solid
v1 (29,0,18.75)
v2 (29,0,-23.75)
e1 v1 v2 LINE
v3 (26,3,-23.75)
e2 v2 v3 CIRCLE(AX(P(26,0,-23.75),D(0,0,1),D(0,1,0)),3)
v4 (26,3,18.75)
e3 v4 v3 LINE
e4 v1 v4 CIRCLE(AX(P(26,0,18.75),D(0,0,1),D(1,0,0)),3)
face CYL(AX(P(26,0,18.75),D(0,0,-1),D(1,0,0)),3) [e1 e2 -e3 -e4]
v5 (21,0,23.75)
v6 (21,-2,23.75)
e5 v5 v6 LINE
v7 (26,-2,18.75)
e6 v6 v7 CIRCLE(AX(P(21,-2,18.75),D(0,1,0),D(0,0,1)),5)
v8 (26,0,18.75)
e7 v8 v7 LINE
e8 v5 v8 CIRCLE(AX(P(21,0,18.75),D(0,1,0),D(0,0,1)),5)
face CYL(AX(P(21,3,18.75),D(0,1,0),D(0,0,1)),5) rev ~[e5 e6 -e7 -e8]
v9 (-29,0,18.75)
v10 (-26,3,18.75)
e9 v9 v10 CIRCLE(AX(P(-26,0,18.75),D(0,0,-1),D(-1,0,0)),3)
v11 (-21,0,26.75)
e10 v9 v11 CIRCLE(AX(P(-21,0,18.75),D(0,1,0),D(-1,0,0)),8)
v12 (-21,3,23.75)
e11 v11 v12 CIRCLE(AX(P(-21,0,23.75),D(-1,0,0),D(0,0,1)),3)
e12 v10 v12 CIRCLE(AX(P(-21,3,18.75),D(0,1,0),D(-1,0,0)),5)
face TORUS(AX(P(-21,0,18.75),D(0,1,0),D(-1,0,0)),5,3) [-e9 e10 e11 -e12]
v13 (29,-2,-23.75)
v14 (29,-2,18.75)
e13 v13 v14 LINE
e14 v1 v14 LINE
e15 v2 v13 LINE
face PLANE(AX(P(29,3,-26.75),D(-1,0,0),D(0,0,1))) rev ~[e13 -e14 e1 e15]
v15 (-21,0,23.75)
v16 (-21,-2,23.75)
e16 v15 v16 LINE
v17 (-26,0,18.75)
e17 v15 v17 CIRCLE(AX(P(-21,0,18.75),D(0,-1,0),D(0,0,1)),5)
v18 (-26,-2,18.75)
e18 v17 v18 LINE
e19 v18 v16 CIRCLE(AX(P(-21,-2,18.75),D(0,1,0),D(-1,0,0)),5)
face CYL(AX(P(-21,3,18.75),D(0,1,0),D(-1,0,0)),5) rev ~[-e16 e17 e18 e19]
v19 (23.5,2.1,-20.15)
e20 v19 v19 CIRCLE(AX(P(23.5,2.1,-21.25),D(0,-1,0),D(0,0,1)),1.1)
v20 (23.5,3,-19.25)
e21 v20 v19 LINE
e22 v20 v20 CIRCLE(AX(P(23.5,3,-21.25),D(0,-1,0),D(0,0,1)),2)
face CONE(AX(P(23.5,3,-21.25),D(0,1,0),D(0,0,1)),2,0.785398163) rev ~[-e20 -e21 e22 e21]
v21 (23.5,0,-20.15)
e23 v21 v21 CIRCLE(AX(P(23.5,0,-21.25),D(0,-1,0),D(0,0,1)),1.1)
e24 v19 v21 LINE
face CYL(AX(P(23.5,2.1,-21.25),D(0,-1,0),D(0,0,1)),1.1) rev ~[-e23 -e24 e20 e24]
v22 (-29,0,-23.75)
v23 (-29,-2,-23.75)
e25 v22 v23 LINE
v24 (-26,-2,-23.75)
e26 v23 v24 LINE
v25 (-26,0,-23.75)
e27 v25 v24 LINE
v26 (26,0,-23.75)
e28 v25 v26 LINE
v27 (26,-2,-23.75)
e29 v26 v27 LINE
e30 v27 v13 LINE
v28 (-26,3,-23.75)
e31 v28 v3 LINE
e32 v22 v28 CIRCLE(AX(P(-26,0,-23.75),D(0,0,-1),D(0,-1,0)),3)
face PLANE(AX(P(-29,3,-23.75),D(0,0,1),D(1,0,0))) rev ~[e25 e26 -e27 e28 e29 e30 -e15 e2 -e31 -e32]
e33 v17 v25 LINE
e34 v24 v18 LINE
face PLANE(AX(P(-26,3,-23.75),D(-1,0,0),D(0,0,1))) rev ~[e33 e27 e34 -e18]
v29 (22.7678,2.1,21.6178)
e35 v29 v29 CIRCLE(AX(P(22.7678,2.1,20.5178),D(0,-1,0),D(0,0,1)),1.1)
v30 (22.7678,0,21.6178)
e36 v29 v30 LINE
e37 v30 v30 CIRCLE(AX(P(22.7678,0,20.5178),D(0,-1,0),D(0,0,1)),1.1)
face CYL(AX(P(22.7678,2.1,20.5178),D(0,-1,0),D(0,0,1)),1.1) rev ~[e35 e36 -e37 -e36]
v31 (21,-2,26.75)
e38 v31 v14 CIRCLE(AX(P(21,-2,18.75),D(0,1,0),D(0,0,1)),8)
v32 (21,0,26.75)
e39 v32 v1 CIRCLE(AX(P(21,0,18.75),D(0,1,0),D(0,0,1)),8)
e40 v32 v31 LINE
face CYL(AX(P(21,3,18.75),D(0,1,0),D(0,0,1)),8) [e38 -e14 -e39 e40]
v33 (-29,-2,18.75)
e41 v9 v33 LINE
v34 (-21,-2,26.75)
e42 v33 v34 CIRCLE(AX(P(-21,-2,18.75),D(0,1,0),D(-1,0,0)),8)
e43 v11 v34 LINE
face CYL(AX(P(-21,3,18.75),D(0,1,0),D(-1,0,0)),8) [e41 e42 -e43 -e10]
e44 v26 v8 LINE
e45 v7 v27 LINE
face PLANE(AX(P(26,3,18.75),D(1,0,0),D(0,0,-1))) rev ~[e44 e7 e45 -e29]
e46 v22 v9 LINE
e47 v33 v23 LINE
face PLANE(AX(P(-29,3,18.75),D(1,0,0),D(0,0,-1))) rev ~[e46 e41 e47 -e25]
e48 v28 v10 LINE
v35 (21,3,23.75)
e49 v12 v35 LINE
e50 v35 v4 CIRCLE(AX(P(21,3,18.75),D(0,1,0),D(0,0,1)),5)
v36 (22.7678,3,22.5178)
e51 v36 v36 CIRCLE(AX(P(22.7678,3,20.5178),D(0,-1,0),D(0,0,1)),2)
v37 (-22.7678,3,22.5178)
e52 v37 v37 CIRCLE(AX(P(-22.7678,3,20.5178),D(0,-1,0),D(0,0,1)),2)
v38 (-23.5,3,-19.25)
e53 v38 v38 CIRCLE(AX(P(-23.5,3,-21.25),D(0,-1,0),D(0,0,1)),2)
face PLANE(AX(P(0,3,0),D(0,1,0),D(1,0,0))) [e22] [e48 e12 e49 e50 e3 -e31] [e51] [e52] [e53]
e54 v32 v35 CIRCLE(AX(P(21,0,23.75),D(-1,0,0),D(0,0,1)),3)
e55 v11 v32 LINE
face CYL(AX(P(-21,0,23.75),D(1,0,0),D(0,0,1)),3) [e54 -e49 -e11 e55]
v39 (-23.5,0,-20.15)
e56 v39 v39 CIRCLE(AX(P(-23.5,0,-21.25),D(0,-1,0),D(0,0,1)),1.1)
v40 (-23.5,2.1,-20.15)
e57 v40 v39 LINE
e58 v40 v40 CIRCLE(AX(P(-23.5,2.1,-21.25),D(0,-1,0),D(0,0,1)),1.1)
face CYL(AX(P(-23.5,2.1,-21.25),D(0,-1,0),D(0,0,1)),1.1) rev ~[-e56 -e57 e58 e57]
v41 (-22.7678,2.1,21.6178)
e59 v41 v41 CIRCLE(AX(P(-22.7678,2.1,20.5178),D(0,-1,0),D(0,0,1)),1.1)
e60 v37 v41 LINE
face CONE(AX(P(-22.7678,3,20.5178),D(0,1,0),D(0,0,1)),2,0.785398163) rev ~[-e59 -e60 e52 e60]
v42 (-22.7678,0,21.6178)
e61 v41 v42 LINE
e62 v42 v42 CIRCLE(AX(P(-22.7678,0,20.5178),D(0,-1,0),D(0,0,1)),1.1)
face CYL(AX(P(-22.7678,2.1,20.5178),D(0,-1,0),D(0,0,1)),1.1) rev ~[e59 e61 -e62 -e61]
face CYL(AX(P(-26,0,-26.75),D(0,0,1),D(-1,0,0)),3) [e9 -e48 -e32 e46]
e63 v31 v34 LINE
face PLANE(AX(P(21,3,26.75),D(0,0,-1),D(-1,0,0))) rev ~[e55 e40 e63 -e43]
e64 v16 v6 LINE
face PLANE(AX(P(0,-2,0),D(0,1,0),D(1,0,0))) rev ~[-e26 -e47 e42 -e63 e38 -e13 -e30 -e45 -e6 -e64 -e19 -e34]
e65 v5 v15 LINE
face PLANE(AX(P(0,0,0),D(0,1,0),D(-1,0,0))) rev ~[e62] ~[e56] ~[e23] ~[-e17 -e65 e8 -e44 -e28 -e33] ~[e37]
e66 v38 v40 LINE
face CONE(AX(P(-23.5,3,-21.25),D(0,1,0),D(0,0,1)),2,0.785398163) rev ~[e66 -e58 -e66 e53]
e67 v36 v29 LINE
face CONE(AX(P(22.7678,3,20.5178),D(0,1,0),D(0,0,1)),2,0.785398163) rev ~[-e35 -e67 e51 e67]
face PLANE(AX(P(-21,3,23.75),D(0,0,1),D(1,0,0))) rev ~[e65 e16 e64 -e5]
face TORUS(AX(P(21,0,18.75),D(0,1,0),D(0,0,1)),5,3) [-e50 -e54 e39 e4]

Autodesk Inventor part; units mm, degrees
ref_plane "YZ Plane" through (0, 0, 0) normal (1, 0, 0) x (0, 1, 0)
ref_plane "XZ Plane" through (0, 0, 0) normal (0, 1, 0) x (-1, 0, 0)
ref_plane "XY Plane" through (0, 0, 0) normal (0, 0, 1) x (1, 0, 0)
sketch "Sketch1" plane through (0, 0, 0) normal (0, 1, 0) x (-1, 0, 0)
  line L0 (-26, 23.75) -> (26, 23.75)
  line L1 (26, 23.75) -> (26, -23.75)
  line L2 (26, -23.75) -> (-26, -23.75)
  line L3 (-26, -23.75) -> (-26, 23.75)
  line L4 (-26, 23.75) -> (26, -23.75) construction
  line L5 (26, 23.75) -> (-26, -23.75) construction
  point P0 (0, 0)
  dimension "d0" = 52
  dimension "d1" = 47.5
extrude "Extrusion1" add sketch "Sketch1" along normal blind 3
fillet "Fillet1" radius 5 2 edges at (26, 1.5, 23.75) (-26, 1.5, 23.75)
sketch "Sketch2" plane through (0, 3, 0) normal (0, 1, 0) x (1, 0, 0)
  arc A0 (-26, -18.75) -> (-21, -23.75) centre (-21, -18.75) ccw projected
  line L0 (-21, -23.75) -> (21, -23.75) projected
  arc A1 (21, -23.75) -> (26, -18.75) centre (21, -18.75) ccw projected
  line L1 (26, -18.75) -> (26, 23.75) projected
  line L2 (26, 23.75) -> (-26, 23.75) projected
  line L3 (-26, 23.75) -> (-26, -18.75) projected
  line L4 (29, 26.75) -> (29, -18.75)
  arc A2 (21, -26.75) -> (29, -18.75) centre (21, -18.75) ccw
  line L5 (21, -26.75) -> (-21, -26.75)
  arc A3 (-29, -18.75) -> (-21, -26.75) centre (-21, -18.75) ccw
  line L6 (-29, -18.75) -> (-29, 26.75)
  line L7 (-29, 26.75) -> (29, 26.75)
  point P0 (0, 0)
  dimension "d5" = 3
extrude "Extrusion2" add sketch "Sketch2" against normal blind 5
sketch "Sketch3" plane through (0, 3, 0) normal (0, 1, 0) x (1, 0, 0)
  line L0 (26, -18.75) -> (26, 23.75) projected
  line L1 (29, 26.75) -> (26, 26.75)
  line L2 (26, 26.75) -> (26, 23.75)
  line L3 (26, 23.75) -> (29, 23.75)
  line L4 (29, 23.75) -> (29, 26.75)
  line L5 (26, 23.75) -> (21, 23.75)
  line L6 (21, 23.75) -> (21, 18.75)
  line L7 (21, 18.75) -> (26, 18.75)
  line L8 (26, 18.75) -> (26, 23.75)
  line L9 (-29, 26.75) -> (-26, 26.75)
  line L10 (-26, 26.75) -> (-26, 23.75)
  line L11 (-26, 23.75) -> (-29, 23.75)
  line L12 (-29, 23.75) -> (-29, 26.75)
  line L13 (-26, 23.75) -> (-21, 23.75)
  line L14 (-21, 23.75) -> (-21, 18.75)
  line L15 (-21, 18.75) -> (-26, 18.75)
  line L16 (-26, 18.75) -> (-26, 23.75)
  arc A0 (-29, -18.75) -> (-21, -26.75) centre (-21, -18.75) ccw projected
  line L17 (21, 18.75) -> (-21, 18.75)
  line L18 (-21, 18.75) -> (-21, -18.75)
  line L19 (-21, -18.75) -> (21, -18.75)
  line L20 (21, -18.75) -> (21, 18.75)
  line L21 (-21, -18.75) -> (-26, -18.75)
  line L22 (-26, -18.75) -> (-26, -23.75)
  line L23 (-26, -23.75) -> (-21, -23.75)
  line L24 (-21, -23.75) -> (-21, -18.75)
  line L25 (-21, -18.75) -> (-24.5355, -22.2855)
  line L26 (-21, -18.75) -> (-16, -18.75) construction
  line L27 (21, -18.75) -> (24.5355, -22.2855)
  line L28 (24.5355, -22.2855) -> (-24.5355, -22.2855)
  line L29 (26, 18.75) -> (21, 23.75)
  line L30 (-21, 23.75) -> (-26, 18.75)
  line L31 (22.7678, -20.5178) -> (-22.7678, -20.5178)
  line L32 (23.5, 21.25) -> (-23.5, 21.25)
  point P0 (0, 0)
  dimension "d8" = 3
  dimension "d9" = 3
  dimension "d10" = 5
  dimension "d11" = 5
  dimension "d12" = 3
  dimension "d13" = 3
  dimension "d14" = 5
  dimension "d15" = 5
  dimension "d16" = 37.5
  dimension "d17" = 5
  dimension "d18" = 5
  dimension "d19" = 5
  dimension "d20" = 135
  dimension "d21" = 5
hole "Hole1" at (-23.5, 3, -21.25) at (23.5, 3, -21.25) at (22.7678, 3, 20.5178) at (-22.7678, 3, 20.5178) direction (0, -1, 0) diameter 2.2 end through all countersink diameter 4 countersink angle 90
fillet "Fillet2" radius 3 5 edges at (26.6569, 3, 24.4069) (0, 3, 26.75) (-26.6569, 3, 24.4069) (-29, 3, -4) (29, 3, -4)
thicken "Thicken1" operation add thickness 3 both sides no extend neighbours yes toward (0, 0, 1) faces at (8.6667, -0.3333, -26.75)
properties part number "Closing_Stepper_2"
